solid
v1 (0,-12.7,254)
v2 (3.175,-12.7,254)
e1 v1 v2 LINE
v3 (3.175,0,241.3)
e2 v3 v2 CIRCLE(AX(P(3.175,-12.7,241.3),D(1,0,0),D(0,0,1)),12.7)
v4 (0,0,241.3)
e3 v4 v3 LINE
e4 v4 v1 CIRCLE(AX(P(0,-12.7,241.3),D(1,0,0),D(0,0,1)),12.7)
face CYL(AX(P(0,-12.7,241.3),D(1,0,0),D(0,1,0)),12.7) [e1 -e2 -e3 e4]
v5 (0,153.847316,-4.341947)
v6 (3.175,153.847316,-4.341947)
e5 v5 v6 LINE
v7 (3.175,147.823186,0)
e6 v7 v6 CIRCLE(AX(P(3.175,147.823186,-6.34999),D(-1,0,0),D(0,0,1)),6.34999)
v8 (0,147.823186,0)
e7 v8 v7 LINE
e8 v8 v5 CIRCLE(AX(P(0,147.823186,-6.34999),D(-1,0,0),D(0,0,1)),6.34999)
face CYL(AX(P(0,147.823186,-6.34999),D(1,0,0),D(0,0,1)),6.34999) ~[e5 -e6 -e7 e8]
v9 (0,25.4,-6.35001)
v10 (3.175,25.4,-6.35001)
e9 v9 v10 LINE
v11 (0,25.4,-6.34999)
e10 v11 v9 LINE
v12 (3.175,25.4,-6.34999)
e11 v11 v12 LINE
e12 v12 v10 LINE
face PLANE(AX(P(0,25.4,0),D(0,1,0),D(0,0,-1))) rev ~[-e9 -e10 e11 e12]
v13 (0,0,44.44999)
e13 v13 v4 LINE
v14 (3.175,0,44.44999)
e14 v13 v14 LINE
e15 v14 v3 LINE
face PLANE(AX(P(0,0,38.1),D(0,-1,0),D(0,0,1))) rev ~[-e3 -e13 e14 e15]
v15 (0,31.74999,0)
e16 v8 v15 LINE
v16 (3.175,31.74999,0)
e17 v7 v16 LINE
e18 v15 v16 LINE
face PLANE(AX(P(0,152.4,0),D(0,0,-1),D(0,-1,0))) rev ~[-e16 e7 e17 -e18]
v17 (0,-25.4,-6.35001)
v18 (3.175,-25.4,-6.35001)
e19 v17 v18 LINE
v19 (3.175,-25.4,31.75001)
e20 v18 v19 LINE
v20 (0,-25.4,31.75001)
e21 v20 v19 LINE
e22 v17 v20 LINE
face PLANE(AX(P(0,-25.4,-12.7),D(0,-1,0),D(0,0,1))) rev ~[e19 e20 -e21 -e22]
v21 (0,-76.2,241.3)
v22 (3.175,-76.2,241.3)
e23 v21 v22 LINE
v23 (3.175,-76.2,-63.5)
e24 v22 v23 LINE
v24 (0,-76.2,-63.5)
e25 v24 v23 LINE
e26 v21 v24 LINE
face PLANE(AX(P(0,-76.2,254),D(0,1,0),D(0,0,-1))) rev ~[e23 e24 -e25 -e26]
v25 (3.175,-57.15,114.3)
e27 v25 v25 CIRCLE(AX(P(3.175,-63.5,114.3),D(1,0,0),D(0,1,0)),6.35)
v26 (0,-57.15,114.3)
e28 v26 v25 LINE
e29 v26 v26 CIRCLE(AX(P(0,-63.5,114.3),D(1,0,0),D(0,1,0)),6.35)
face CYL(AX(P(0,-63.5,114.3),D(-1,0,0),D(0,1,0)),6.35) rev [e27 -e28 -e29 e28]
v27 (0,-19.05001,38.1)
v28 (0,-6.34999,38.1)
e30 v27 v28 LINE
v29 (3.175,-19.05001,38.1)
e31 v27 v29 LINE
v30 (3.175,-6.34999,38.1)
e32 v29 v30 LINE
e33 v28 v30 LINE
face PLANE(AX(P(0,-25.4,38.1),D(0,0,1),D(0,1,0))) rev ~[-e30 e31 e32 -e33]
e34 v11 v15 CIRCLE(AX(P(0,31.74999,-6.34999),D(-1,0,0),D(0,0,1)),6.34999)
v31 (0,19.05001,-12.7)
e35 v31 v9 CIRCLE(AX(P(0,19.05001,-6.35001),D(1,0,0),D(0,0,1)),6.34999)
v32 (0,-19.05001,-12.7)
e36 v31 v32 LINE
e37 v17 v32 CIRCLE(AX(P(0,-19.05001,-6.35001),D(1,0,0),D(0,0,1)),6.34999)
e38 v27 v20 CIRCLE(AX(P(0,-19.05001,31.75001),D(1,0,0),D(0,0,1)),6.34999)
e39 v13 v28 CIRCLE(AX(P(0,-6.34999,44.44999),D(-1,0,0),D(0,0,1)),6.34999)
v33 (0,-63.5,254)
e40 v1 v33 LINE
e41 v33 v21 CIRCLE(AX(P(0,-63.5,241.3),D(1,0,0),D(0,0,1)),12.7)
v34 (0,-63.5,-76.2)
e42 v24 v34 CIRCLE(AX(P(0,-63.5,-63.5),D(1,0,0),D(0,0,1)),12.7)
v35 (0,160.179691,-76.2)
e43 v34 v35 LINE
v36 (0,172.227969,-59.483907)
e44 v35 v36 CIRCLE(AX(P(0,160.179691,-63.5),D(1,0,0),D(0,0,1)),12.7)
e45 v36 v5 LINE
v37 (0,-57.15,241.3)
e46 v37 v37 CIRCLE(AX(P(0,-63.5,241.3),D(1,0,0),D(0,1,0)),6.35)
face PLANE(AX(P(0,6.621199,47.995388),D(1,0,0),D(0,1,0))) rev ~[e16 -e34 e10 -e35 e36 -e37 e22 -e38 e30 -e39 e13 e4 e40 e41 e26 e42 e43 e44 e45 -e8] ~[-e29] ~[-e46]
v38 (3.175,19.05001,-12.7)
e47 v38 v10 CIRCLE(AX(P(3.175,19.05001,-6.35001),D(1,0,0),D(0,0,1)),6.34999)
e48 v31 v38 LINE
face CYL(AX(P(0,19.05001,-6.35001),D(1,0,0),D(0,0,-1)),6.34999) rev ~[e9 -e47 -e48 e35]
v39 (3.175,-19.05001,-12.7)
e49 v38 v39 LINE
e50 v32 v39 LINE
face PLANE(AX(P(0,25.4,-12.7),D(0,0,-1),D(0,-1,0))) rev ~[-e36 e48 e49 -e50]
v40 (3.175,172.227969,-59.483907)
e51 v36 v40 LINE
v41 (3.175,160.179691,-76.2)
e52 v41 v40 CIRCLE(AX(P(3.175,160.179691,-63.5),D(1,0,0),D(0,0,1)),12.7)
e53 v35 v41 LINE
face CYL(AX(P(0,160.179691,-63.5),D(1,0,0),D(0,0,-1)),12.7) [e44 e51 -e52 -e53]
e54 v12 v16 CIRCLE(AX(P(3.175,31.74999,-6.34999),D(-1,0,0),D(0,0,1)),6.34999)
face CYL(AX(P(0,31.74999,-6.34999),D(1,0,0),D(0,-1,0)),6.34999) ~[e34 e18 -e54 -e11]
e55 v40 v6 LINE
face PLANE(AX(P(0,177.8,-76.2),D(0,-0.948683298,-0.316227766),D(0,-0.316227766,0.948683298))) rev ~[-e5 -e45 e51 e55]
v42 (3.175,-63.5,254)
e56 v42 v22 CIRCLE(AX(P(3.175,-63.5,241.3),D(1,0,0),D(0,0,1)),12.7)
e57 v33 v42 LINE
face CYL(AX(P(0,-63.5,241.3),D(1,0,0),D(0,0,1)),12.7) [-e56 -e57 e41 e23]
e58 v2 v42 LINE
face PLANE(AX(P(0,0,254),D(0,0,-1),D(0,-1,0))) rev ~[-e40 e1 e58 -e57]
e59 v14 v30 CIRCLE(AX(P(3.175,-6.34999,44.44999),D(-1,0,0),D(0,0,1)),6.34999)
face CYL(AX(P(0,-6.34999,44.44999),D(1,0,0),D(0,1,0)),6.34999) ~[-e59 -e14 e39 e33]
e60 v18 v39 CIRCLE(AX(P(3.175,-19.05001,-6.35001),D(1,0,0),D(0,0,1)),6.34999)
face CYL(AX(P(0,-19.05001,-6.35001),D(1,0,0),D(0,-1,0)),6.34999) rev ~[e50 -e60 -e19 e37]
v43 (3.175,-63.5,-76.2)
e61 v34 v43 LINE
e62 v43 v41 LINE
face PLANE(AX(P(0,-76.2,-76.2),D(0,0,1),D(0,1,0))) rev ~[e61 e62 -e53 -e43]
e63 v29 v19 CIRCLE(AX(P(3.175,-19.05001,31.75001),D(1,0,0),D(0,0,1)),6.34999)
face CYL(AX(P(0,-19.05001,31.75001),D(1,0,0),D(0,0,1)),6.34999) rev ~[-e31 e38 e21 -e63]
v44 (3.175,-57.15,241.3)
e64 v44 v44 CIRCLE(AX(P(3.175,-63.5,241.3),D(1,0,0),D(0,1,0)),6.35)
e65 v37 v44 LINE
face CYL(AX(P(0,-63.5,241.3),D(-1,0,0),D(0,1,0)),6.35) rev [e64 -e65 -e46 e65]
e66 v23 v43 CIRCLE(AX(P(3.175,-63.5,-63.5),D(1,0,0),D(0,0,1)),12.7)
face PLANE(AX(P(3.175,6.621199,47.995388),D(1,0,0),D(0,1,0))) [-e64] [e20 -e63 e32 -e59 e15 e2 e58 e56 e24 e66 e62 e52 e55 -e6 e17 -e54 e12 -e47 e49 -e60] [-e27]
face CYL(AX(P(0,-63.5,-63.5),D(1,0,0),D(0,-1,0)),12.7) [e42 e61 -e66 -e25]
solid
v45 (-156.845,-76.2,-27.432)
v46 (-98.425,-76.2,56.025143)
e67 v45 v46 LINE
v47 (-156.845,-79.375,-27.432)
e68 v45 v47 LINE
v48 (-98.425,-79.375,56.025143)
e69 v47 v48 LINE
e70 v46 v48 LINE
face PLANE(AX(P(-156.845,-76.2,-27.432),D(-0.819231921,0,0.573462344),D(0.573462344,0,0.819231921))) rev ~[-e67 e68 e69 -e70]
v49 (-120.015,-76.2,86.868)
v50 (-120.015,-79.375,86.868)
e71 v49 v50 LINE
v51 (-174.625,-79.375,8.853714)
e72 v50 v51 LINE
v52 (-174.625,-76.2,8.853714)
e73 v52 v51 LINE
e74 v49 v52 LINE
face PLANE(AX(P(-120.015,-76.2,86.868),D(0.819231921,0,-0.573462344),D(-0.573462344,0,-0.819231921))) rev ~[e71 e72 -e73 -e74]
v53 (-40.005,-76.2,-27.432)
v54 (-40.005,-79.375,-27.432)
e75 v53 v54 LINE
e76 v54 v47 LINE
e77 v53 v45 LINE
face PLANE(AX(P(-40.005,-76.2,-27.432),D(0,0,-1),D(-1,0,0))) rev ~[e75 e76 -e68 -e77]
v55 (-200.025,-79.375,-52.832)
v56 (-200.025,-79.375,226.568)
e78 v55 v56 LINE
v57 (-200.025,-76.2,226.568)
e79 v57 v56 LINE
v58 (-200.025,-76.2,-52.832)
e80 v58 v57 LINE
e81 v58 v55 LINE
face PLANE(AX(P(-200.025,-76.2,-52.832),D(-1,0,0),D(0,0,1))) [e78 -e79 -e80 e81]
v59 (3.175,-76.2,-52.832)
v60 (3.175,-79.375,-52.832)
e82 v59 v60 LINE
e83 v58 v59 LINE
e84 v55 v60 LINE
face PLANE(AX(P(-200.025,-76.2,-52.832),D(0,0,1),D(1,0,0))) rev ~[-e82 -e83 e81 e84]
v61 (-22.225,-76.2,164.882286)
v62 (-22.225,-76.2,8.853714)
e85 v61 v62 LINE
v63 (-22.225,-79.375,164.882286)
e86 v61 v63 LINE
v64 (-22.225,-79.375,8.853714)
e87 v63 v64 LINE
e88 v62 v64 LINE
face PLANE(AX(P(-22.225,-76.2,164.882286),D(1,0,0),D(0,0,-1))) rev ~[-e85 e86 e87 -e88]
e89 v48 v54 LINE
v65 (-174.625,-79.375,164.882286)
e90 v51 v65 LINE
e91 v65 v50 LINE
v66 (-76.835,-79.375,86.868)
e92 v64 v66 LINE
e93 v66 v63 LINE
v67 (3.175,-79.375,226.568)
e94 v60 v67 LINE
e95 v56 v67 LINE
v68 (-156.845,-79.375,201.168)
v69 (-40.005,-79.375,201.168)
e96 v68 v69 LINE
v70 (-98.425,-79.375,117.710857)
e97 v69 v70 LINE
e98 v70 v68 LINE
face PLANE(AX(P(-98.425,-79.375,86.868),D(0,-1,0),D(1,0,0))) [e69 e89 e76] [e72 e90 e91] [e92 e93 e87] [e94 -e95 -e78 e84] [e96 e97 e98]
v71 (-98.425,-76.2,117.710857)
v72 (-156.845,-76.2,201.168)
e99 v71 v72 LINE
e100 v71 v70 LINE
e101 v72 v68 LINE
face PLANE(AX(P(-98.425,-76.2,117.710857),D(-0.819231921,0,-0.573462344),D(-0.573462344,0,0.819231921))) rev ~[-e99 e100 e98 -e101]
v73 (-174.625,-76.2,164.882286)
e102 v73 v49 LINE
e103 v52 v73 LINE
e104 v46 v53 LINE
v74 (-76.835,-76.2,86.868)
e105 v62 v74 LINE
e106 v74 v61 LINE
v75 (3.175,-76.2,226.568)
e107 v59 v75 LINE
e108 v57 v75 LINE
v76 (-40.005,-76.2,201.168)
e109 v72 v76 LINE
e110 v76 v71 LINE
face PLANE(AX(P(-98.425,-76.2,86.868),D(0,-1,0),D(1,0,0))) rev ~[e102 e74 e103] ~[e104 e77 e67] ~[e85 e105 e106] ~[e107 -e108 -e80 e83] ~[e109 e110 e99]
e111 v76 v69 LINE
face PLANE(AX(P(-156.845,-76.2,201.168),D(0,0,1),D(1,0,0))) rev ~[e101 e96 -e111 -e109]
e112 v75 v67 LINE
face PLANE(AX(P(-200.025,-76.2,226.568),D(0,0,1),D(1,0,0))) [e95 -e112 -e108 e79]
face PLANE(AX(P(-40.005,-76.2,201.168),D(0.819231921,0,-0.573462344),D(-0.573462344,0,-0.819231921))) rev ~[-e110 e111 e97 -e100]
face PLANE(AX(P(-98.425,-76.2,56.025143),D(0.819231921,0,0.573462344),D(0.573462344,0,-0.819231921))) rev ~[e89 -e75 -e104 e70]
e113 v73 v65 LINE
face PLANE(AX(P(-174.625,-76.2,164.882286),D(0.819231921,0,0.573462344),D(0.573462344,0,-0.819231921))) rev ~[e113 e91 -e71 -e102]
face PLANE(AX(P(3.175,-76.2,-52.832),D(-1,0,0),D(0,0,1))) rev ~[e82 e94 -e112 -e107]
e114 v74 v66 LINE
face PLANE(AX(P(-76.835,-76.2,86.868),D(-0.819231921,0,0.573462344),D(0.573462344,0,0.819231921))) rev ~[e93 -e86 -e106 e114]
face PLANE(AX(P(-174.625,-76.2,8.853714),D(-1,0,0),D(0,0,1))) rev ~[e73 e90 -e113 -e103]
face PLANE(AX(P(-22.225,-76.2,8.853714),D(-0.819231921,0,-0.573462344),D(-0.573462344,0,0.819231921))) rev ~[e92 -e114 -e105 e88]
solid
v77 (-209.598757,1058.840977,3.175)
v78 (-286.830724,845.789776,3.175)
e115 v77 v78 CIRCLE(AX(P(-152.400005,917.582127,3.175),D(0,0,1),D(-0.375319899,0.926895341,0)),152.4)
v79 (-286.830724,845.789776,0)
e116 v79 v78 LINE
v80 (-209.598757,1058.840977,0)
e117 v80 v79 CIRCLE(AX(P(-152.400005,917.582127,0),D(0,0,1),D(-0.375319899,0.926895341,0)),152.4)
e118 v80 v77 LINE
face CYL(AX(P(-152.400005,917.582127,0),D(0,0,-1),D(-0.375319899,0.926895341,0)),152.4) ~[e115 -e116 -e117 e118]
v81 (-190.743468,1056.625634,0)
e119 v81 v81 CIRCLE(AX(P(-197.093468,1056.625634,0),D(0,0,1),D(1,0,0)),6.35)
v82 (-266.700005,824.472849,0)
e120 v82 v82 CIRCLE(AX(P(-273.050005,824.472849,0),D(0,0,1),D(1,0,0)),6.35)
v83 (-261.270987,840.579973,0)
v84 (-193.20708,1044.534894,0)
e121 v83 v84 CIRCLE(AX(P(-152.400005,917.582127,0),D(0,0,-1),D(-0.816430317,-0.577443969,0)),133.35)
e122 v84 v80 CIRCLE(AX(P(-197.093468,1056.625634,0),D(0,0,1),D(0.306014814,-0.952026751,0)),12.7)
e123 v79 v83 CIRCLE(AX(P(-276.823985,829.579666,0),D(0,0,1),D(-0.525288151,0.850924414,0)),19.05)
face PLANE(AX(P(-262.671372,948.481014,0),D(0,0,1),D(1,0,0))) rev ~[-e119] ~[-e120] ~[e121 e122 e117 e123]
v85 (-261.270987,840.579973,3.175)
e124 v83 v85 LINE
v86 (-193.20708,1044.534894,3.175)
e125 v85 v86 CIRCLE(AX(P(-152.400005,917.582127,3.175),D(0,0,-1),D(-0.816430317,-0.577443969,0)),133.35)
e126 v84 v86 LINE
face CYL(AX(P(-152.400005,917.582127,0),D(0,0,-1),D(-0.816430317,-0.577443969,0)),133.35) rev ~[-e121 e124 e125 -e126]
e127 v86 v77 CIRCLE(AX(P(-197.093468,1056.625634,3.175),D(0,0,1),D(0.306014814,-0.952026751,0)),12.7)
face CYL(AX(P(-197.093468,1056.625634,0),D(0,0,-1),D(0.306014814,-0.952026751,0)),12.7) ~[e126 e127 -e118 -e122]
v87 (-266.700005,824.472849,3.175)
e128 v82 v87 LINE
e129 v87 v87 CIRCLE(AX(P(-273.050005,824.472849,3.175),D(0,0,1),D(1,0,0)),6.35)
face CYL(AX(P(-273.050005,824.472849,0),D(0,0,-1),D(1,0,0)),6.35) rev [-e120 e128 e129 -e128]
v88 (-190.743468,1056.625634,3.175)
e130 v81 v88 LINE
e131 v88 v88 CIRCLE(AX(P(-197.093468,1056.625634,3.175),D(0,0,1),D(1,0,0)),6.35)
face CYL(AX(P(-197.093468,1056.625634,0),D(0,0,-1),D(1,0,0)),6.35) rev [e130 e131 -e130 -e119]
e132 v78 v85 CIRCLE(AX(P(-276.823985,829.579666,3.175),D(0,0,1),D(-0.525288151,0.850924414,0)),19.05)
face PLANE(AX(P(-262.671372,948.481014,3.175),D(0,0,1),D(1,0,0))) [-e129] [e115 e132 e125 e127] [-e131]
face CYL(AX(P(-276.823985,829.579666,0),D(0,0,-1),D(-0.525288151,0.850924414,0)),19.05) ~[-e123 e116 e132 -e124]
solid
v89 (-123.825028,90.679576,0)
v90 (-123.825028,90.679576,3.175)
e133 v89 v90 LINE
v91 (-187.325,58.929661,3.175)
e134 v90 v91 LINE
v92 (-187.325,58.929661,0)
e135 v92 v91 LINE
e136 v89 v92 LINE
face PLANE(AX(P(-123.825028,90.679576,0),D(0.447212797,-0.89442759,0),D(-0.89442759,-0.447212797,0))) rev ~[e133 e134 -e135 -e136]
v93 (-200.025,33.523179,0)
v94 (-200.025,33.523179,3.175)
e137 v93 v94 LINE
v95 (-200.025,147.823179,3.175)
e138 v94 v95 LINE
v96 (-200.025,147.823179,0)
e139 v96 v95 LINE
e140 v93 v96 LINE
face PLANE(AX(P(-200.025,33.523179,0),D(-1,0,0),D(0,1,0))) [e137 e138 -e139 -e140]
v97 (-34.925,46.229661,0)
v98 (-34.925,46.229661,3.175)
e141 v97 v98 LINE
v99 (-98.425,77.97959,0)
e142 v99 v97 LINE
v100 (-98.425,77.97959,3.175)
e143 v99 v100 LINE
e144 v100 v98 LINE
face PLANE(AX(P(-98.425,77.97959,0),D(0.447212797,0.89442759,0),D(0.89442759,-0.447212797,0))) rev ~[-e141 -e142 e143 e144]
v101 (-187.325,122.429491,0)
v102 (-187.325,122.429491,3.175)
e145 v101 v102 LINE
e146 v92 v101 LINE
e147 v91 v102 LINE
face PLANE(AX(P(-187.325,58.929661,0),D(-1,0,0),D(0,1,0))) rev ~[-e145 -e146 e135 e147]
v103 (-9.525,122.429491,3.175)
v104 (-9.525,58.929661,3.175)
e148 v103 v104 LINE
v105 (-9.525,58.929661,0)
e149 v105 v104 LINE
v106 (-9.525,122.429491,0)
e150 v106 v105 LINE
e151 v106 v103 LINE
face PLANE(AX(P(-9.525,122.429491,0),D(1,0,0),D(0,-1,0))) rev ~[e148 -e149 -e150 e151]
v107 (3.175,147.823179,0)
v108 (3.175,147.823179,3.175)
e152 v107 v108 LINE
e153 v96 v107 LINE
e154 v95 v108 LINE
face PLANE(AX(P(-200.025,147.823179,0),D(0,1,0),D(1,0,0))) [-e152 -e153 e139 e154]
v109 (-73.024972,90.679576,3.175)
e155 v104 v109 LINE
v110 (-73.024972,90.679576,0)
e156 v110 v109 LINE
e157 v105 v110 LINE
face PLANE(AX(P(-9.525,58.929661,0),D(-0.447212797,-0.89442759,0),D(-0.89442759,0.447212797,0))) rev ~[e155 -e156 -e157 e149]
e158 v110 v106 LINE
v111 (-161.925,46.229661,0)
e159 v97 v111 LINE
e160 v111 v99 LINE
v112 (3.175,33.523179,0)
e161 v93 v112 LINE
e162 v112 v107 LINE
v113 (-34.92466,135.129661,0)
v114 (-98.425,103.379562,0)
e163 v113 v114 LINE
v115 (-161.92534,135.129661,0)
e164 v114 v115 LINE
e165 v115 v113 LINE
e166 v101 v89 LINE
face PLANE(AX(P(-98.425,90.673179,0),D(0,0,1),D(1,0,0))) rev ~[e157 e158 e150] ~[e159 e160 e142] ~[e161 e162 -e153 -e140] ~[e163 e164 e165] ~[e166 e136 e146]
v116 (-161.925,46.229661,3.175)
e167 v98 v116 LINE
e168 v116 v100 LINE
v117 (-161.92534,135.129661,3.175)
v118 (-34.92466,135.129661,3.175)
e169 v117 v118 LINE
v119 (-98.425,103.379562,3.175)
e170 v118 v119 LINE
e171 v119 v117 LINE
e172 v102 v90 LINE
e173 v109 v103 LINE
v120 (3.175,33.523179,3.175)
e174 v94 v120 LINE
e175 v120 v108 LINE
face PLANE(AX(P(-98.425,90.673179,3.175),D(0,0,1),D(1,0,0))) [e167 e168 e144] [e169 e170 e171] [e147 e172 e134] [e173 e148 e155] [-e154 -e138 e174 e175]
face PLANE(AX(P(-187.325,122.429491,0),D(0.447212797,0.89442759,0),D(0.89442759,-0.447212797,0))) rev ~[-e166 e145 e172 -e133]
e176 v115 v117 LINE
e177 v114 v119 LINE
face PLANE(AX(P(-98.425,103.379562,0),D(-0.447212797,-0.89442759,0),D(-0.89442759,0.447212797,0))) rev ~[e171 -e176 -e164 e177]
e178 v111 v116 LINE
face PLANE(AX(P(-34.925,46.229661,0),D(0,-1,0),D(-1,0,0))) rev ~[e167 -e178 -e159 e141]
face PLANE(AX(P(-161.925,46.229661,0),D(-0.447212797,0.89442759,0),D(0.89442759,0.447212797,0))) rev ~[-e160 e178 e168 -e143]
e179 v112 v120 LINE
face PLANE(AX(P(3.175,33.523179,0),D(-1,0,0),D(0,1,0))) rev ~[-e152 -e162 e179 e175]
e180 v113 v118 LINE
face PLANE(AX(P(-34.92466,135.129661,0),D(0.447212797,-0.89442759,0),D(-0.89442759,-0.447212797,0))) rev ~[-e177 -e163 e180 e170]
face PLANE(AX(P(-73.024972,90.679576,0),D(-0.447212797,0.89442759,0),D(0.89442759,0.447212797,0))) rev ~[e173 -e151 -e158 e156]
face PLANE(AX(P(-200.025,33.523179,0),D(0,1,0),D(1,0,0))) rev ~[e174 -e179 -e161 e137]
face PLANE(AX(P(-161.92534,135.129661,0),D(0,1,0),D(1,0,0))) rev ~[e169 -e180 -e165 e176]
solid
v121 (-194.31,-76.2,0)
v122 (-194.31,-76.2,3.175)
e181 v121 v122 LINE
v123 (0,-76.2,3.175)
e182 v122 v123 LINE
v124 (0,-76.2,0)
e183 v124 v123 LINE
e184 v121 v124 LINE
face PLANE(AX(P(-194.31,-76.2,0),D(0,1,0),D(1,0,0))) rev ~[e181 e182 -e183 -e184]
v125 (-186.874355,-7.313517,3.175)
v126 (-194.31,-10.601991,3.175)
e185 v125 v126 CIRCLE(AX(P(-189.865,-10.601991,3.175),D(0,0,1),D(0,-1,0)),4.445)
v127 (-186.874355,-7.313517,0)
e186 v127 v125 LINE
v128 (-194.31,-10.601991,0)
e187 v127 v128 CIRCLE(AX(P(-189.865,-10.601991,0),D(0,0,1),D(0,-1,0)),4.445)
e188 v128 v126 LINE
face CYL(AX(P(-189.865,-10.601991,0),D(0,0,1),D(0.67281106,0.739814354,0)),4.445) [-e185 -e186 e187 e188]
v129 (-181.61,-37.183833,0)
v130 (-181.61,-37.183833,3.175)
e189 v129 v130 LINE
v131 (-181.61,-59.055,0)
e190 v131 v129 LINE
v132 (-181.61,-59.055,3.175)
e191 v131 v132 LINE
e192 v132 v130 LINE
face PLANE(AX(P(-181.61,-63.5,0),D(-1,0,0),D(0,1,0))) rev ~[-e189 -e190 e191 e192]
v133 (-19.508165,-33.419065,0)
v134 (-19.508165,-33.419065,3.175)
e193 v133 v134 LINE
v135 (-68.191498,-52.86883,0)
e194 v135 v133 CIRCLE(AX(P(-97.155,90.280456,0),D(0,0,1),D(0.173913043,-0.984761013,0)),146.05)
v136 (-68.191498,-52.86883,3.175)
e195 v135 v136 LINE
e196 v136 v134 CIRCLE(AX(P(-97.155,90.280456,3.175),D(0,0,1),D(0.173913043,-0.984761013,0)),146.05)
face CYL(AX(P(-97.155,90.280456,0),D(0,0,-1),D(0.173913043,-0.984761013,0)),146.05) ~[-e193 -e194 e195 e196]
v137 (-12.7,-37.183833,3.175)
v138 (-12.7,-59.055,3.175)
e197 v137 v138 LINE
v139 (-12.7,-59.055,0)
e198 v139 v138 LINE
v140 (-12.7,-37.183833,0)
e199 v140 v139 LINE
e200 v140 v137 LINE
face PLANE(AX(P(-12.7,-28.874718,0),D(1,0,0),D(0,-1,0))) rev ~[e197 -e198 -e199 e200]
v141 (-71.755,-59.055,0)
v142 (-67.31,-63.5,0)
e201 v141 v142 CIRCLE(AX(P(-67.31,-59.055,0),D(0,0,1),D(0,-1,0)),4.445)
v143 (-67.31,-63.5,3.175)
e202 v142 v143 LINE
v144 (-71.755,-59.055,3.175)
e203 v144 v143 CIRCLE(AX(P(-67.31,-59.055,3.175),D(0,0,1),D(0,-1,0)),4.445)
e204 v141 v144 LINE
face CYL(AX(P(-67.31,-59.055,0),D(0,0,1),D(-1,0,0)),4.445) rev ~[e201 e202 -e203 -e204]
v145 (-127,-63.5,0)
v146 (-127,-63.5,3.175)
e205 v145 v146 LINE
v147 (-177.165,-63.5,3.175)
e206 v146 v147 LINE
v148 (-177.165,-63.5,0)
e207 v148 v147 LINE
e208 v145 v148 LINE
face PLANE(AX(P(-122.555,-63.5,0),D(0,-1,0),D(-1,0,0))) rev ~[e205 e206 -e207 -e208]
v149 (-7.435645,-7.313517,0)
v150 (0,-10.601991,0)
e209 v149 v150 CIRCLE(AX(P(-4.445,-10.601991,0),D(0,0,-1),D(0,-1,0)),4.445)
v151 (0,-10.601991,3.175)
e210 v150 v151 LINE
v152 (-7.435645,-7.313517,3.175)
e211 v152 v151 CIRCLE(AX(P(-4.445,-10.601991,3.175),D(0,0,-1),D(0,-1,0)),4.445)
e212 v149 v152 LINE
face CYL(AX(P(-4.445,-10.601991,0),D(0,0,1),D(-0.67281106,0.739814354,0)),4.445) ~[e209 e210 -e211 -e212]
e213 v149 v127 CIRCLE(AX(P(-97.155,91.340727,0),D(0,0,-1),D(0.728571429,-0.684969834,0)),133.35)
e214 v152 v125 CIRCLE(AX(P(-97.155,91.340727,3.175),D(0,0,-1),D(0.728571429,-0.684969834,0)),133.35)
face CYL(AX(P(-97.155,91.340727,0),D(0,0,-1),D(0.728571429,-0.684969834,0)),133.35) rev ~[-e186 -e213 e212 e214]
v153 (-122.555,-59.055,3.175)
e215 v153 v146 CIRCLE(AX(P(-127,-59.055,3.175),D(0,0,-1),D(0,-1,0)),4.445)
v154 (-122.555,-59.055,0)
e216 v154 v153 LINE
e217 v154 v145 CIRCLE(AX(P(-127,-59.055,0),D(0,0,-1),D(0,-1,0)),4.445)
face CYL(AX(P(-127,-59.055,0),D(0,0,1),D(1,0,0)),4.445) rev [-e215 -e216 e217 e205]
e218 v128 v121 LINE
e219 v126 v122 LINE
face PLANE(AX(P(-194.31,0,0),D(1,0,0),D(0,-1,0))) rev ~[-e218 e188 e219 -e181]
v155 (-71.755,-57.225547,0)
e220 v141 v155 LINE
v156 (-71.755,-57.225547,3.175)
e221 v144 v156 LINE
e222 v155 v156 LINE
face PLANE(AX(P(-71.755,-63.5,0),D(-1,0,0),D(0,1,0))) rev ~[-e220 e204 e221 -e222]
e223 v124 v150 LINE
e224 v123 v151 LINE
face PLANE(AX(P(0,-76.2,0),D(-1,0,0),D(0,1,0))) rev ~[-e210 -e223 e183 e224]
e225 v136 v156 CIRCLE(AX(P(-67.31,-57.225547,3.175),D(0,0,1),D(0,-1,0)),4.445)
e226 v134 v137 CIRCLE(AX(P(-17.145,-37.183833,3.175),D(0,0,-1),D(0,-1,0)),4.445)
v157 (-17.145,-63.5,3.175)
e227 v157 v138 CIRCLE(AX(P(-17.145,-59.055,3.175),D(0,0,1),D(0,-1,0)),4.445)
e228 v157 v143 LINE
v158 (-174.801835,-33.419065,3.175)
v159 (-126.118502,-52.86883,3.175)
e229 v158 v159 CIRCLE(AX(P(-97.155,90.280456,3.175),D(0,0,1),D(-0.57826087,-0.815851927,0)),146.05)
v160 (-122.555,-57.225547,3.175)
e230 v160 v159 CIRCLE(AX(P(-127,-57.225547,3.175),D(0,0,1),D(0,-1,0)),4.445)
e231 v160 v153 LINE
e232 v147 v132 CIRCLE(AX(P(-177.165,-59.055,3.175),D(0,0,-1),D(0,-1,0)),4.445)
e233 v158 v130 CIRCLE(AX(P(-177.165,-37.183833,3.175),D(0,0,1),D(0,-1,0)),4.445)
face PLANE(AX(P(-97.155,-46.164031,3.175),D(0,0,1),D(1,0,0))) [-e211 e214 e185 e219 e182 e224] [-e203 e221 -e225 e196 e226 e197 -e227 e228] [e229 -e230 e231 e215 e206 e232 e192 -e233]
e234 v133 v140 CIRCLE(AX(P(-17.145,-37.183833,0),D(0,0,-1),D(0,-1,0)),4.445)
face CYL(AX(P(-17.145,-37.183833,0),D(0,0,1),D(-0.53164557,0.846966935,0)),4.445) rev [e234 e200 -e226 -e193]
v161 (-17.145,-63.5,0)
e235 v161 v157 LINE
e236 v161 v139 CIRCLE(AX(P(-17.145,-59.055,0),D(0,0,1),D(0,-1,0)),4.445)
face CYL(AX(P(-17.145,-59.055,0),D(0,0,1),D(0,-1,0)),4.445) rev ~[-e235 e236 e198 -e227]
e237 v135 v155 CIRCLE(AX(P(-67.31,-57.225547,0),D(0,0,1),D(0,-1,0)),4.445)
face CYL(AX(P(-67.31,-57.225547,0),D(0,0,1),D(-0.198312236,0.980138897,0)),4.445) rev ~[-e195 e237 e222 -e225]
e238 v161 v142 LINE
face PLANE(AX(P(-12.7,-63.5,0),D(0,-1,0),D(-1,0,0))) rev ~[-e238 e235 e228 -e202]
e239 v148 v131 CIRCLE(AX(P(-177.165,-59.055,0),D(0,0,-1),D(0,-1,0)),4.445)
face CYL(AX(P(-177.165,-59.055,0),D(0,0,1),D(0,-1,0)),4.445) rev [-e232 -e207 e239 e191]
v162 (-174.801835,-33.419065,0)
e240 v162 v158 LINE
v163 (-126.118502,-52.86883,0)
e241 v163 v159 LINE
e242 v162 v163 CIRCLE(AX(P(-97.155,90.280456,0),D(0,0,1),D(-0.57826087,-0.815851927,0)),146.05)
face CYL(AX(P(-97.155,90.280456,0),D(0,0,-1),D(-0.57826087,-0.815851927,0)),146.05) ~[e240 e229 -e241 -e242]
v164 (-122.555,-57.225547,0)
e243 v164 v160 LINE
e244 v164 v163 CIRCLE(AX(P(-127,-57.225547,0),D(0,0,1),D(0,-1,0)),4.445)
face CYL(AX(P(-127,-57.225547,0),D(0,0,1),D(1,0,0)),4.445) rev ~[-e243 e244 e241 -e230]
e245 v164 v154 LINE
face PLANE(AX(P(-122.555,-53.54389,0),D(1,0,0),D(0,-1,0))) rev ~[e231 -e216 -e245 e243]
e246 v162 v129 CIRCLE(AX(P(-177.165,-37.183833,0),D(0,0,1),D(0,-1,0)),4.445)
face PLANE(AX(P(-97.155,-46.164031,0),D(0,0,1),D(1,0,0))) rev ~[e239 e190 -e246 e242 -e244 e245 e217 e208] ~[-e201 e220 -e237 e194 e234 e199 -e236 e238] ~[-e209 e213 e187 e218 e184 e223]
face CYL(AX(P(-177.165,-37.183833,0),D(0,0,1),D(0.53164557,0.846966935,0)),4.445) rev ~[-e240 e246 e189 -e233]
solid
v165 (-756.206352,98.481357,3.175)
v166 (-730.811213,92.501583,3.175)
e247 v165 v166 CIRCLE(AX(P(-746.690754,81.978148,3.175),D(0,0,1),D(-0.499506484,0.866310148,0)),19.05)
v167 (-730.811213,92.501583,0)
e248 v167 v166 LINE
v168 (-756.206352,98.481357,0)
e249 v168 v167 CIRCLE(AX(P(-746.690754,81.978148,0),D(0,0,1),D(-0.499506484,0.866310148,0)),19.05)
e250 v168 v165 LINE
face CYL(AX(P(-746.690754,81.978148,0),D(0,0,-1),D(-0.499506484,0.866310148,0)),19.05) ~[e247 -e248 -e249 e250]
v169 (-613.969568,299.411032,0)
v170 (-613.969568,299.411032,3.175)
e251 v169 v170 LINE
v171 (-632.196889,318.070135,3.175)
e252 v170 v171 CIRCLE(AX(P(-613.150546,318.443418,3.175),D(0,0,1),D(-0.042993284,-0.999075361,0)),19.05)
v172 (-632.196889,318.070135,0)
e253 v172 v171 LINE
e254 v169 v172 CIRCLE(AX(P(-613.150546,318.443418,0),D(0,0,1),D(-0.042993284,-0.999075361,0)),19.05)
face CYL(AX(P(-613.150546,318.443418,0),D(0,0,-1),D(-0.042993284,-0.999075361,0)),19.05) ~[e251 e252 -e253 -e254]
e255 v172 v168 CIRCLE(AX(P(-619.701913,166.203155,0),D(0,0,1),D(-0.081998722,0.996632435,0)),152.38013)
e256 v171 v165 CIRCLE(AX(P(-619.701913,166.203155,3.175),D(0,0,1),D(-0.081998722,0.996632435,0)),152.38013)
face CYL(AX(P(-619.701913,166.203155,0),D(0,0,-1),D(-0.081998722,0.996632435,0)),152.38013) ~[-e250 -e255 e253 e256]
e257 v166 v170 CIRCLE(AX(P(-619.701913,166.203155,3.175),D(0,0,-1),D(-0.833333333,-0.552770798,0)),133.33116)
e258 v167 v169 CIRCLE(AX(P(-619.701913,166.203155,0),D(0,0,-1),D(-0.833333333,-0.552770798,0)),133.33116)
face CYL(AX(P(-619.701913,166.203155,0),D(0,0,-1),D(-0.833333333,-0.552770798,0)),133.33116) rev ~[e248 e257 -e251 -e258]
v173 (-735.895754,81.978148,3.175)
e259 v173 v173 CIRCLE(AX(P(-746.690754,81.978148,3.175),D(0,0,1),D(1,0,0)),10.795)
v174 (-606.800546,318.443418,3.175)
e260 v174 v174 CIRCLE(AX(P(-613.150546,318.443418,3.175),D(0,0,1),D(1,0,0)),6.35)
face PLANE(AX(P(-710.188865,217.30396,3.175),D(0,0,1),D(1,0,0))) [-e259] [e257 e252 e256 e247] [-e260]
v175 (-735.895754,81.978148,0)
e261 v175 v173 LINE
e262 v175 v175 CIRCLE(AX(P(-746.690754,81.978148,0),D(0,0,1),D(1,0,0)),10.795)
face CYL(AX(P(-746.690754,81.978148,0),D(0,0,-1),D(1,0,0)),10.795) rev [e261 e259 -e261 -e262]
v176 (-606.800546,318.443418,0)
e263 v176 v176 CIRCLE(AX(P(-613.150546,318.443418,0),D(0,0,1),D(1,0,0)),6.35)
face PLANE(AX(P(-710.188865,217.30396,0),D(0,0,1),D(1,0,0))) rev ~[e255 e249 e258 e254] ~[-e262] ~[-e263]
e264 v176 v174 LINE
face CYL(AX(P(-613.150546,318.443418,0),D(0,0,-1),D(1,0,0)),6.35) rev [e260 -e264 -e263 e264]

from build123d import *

# Parameters (mm, degrees)
F0_R      = 6.35
F1_DEPTH  = 3.175
F2_R      = 12.7
F3_R      = 6.34999
F4_W      = 203.2
F4_H      = 114.3
F5_DEPTH  = 3.175
F6_W      = 203.2
F6_H      = 279.4
F7_DEPTH  = 3.175
F10_DEPTH = 3.175
F11_R     = 4.445
F12_R     = 12.7
F13_R     = 10.795
F13_R_2   = 6.35
F14_DEPTH = 3.175
F15_R     = 6.35
F16_DEPTH = 3.175


# Not quite as in the source:
# - a fillet or chamfer is up to 0.001 mm smaller than in the source, because OpenCascade refuses the exact size


with BuildPart() as f1:
    # F0 (on Right) → F1 (new body)
    with BuildSketch(Plane.YZ):
        Polygon((25.4, -12.7), (0, -12.7), (-25.4, -12.7), (-25.4, 38.1), (0, 38.1), (0, 254), (-76.2, 254), (-76.2, -76.2), (177.8, -76.2), (152.4, 0), (25.4, 0), align=None)
        with Locations((-63.5, 114.3)):
            Circle(F0_R, mode=Mode.SUBTRACT)
        with Locations((-63.5, 241.3)):
            Circle(F0_R, mode=Mode.SUBTRACT)
    extrude(amount=F1_DEPTH)

    # F2
    f2_edges = [f1.edges().sort_by_distance(p)[0] for p in [
        (1.5875, -76.2, 254),
        (1.5875, 0, 254),
    ]]
    fillet(f2_edges, radius=F2_R)

    # F3 (radius 6.35 in the source; OpenCascade refuses exactly that, so slightly less here)
    f3_edges = [f1.edges().sort_by_distance(p)[0] for p in [
        (1.5875, 152.4, 0),
        (1.5875, 25.4, 0),
        (1.5875, 25.4, -12.7),
        (1.5875, -25.4, 38.1),
        (1.5875, 0, 38.1),
        (1.5875, -25.4, -12.7),
    ]]
    fillet(f3_edges, radius=F3_R)

    # F12
    f12_edges = [f1.edges().sort_by_distance(p)[0] for p in [
        (1.5875, -76.2, -76.2),
        (1.5875, 177.8, -76.2),
    ]]
    fillet(f12_edges, radius=F12_R)


with BuildPart() as f5:
    # F4 (on face) → F5 (new body)
    with BuildSketch(Plane.XY):
        with Locations((-98.425, 90.6731789526)):
            Rectangle(F4_W, F4_H)
        Polygon((-34.925, 46.2296610243), (-161.925, 46.2296610243), (-98.425, 77.9795901259), align=None, mode=Mode.SUBTRACT)
        Polygon((-187.325, 58.9296610243), (-187.325, 122.4294908681), (-123.8250283594, 90.6795759462), align=None, mode=Mode.SUBTRACT)
        Polygon((-73.0249716406, 90.6795759462), (-9.525, 122.4294908681), (-9.525, 58.9296610243), align=None, mode=Mode.SUBTRACT)
        Polygon((-98.425, 103.3795617665), (-161.9253403131, 135.1296610243), (-34.9246596869, 135.1296610243), align=None, mode=Mode.SUBTRACT)
    extrude(amount=F5_DEPTH)


with BuildPart() as f7:
    # F6 (on face) → F7 (new body)
    with BuildSketch(Plane.XZ.offset(76.2)):
        with Locations((-98.425, 101.6)):
            Rectangle(F6_W, F6_H)
        Polygon((-98.425, 70.7571428571), (-40.005, -12.7), (-156.845, -12.7), align=None, mode=Mode.SUBTRACT)
        Polygon((-76.835, 101.6), (-22.225, 179.6142857143), (-22.225, 23.5857142857), align=None, mode=Mode.SUBTRACT)
        Polygon((-174.625, 23.5857142857), (-174.625, 179.6142857143), (-120.015, 101.6), align=None, mode=Mode.SUBTRACT)
        Polygon((-98.425, 132.4428571429), (-156.845, 215.9), (-40.005, 215.9), align=None, mode=Mode.SUBTRACT)
    extrude(amount=F7_DEPTH)


with BuildPart() as f7_1:
    # F8: moved
    add(f7.part.moved(Location((0, 0, -14.732))))


with BuildPart() as f10:
    # F9 (on Top) → F10 (new body)
    with BuildSketch(Plane.XY):
        with BuildLine():
            ThreePointArc((0, 0), (-97.155, -42.0092726381), (-194.31, 0))
            Line((-194.31, 0), (-194.31, -76.2))
            Line((-194.31, -76.2), (0, -76.2))
            Line((0, -76.2), (0, 0))
        make_face()
        with BuildLine():
            Line((-122.555, -63.5), (-181.61, -63.5))
            Line((-181.61, -63.5), (-181.61, -28.874717996))
            ThreePointArc((-181.61, -28.874717996), (-153.4504018439, -44.4838948062), (-122.555, -53.5438900549))
            Line((-122.555, -53.5438900549), (-122.555, -63.5))
        make_face(mode=Mode.SUBTRACT)
        with BuildLine():
            Line((-12.7, -28.874717996), (-12.7, -63.5))
            Line((-12.7, -63.5), (-71.755, -63.5))
            Line((-71.755, -63.5), (-71.755, -53.5438900549))
            ThreePointArc((-71.755, -53.5438900549), (-40.8595981561, -44.4838948062), (-12.7, -28.874717996))
        make_face(mode=Mode.SUBTRACT)
    extrude(amount=F10_DEPTH)

    # F11
    f11_edges = [f10.edges().sort_by_distance(p)[0] for p in [
        (-122.555, -63.5, 1.5875),
        (-122.555, -53.54389, 1.5875),
        (-181.61, -63.5, 1.5875),
        (-181.61, -28.874718, 1.5875),
        (-12.7, -63.5, 1.5875),
        (-71.755, -63.5, 1.5875),
        (-71.755, -53.54389, 1.5875),
        (-12.7, -28.874718, 1.5875),
        (-194.31, 0, 1.5875),
        (0, 0, 1.5875),
    ]]
    fillet(f11_edges, radius=F11_R)


with BuildPart() as f14:
    # F13 (on Top) → F14 (new body)
    with BuildSketch(Plane.XY):
        with BuildLine():
            ThreePointArc((-632.1968888271, 318.0701347804), (-752.3858015786, 241.1343877568), (-756.2063521379, 98.4813565521))
            ThreePointArc((-756.2063521379, 98.4813565521), (-751.0570291306, 63.4352752545), (-730.811212931, 92.5015833821))
            ThreePointArc((-730.811212931, 92.5015833821), (-735.8008176206, 231.7641386358), (-613.9695684644, 299.4110319849))
            ThreePointArc((-613.9695684644, 299.4110319849), (-599.523415155, 331.7552091602), (-632.1968888271, 318.0701347804))
        make_face()
        with Locations((-746.6907536235, 81.9781482303)):
            Circle(F13_R, mode=Mode.SUBTRACT)
        with Locations((-613.1505463981, 318.4434176172)):
            Circle(F13_R_2, mode=Mode.SUBTRACT)
    extrude(amount=F14_DEPTH)


with BuildPart() as f16:
    # F15 (on Top) → F16 (new body)
    with BuildSketch(Plane.XY):
        with BuildLine():
            ThreePointArc((-261.2709873869, 840.5799733082), (-278.8922283797, 959.7951557271), (-193.2070800325, 1044.5348937844))
            ThreePointArc((-193.2070800325, 1044.5348937844), (-188.7425781177, 1066.1939476514), (-209.5987572531, 1058.8409765764))
            ThreePointArc((-209.5987572532, 1058.8409765764), (-295.6765455954, 969.5204824254), (-286.8307241935, 845.7897757879))
            ThreePointArc((-286.8307241935, 845.7897757879), (-280.6286867095, 810.9134731448), (-261.2709873869, 840.5799733082))
        make_face()
        with Locations((-273.0500046197, 824.472849402)):
            Circle(F15_R, mode=Mode.SUBTRACT)
        with Locations((-197.0934681671, 1056.6256335165)):
            Circle(F15_R, mode=Mode.SUBTRACT)
    extrude(amount=F16_DEPTH)


solid = Compound([f1.part, f5.part, f7_1.part, f10.part, f14.part, f16.part])
